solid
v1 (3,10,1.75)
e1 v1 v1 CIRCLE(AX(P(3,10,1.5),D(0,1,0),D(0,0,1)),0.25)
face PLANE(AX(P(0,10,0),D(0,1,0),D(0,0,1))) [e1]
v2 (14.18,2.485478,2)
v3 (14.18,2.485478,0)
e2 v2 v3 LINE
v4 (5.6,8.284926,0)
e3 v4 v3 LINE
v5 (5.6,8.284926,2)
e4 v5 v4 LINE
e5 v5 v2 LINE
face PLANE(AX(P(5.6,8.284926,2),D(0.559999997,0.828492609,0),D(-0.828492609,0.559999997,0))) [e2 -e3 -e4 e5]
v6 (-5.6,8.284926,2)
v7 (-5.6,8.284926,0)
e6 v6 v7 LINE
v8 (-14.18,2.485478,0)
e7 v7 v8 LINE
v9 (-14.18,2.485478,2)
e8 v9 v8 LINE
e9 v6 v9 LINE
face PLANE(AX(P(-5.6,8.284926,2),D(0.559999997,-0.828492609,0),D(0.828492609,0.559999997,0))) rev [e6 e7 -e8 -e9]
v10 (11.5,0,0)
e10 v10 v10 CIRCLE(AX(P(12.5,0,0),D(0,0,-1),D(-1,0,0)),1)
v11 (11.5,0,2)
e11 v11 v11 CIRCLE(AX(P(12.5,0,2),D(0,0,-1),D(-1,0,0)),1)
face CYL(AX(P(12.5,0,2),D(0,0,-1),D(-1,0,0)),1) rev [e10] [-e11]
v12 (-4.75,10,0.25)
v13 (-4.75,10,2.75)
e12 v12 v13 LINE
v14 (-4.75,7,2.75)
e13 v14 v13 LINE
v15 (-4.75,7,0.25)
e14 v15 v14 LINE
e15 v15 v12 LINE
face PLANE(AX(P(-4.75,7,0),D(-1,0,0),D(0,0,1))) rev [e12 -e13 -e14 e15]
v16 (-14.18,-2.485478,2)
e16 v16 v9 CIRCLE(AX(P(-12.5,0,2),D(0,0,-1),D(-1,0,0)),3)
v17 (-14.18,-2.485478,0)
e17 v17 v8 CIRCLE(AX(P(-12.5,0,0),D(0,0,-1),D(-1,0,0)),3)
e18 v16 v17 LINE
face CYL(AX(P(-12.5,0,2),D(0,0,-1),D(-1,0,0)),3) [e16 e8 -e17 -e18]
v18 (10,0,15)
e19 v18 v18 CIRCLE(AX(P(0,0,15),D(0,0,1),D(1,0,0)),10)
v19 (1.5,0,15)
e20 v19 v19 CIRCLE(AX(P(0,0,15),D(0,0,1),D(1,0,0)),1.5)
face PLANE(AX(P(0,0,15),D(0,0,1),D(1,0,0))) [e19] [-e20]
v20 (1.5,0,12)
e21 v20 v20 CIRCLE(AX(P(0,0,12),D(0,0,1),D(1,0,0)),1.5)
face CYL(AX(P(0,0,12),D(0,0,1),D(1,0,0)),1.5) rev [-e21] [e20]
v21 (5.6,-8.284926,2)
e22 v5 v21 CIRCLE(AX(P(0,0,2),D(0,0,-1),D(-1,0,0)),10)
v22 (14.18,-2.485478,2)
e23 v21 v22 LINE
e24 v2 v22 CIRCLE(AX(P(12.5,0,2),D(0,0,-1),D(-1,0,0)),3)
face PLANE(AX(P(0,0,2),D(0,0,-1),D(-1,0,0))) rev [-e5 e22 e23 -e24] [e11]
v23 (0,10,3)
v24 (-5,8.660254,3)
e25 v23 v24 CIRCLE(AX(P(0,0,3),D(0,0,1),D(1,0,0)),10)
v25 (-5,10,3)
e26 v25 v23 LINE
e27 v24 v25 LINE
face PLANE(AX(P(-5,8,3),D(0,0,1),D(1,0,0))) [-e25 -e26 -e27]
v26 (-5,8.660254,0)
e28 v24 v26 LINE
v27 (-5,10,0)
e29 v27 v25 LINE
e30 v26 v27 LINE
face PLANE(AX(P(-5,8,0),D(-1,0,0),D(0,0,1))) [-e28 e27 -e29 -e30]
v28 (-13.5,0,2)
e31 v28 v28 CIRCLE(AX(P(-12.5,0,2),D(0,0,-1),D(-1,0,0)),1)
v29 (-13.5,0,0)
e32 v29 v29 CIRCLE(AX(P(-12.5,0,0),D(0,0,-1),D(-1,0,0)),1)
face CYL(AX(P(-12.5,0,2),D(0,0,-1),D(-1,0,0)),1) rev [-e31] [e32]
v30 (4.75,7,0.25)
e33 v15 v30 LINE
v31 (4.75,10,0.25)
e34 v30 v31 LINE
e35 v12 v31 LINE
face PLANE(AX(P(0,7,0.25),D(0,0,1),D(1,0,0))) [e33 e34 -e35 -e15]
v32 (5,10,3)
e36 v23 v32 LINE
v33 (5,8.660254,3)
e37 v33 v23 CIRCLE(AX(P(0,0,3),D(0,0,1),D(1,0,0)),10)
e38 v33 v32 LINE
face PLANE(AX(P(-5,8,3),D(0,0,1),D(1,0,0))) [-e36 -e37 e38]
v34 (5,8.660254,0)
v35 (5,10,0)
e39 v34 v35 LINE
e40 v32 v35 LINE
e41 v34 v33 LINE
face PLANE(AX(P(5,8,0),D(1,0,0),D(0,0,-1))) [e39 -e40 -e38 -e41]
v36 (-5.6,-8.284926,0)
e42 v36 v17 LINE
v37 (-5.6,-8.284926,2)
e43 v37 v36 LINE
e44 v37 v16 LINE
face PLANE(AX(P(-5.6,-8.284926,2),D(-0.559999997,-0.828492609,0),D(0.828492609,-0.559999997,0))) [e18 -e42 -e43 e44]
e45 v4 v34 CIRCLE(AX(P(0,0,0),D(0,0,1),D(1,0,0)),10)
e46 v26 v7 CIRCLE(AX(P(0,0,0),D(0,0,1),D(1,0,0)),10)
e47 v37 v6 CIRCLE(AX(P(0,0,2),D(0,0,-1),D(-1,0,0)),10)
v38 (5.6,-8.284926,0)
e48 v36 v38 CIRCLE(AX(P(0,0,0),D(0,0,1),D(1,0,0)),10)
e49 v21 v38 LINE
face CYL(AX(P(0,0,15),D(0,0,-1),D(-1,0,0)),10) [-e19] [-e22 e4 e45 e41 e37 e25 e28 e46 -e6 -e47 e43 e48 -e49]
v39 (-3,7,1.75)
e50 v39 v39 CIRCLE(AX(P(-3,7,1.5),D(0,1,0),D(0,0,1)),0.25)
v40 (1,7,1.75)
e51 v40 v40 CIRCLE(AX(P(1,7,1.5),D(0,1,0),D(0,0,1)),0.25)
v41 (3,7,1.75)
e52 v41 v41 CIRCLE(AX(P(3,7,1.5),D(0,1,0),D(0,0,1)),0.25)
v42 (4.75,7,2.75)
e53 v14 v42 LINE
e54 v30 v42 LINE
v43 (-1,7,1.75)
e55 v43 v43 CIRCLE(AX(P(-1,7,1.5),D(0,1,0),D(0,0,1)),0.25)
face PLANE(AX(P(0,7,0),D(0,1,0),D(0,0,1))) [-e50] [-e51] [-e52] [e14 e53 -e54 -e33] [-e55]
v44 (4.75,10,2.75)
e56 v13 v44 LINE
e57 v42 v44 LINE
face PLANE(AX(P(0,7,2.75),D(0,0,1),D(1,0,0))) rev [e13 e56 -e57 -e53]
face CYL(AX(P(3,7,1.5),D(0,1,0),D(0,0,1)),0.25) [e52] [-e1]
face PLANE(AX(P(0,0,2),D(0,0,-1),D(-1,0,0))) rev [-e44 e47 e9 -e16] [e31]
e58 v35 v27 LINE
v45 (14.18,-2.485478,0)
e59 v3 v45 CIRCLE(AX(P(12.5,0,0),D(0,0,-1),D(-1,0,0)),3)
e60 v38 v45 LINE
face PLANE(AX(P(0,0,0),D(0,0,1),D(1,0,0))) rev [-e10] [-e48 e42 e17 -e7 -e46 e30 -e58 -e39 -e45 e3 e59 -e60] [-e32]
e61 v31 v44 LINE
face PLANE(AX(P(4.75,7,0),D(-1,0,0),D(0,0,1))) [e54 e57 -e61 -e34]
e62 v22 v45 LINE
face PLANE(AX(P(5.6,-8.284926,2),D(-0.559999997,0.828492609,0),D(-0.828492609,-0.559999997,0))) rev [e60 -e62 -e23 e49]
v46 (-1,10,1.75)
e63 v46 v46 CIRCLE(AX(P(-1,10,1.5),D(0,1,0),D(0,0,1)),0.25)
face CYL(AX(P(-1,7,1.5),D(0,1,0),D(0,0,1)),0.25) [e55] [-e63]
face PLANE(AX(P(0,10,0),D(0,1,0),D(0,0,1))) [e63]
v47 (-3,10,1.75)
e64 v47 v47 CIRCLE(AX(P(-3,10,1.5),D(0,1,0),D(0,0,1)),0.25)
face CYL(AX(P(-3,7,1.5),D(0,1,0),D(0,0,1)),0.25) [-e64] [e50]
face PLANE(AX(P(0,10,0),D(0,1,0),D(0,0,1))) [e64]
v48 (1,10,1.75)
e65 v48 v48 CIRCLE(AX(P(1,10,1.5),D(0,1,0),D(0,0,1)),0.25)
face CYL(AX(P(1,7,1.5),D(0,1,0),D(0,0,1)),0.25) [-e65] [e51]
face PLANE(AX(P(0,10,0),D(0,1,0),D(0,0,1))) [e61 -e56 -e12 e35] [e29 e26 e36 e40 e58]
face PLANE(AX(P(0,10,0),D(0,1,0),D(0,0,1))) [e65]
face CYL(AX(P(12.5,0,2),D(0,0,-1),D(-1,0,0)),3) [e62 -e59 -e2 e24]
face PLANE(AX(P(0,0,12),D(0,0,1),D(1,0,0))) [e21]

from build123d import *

# Parameters (mm, degrees)
SKETCH1_R               = 10
BOSS_EXTRUDE1_DEPTH     = 15
BOSS_EXTRUDE2_START     = -2
BOSS_EXTRUDE2_OUTLINE_R = 1
BOSS_EXTRUDE2_DEPTH     = 2
SKETCH3_W               = 10
SKETCH3_H               = 3
BOSS_EXTRUDE3_DEPTH     = 2
SKETCH4_W               = 9.5
SKETCH4_H               = 2.5
SKETCH4_R               = 0.25
CUT_EXTRUDE1_DEPTH      = 3
SKETCH5_R               = 1.5
CUT_EXTRUDE2_DEPTH      = 3


# Read off the part's stored shape, not the designer's step: Boss-Extrude2
with BuildPart() as part:
    # Sketch1 → Boss-Extrude1 (new body)
    with BuildSketch(Plane.XY):
        Circle(SKETCH1_R)
    extrude(amount=BOSS_EXTRUDE1_DEPTH)

    # Boss-Extrude2 outline → Boss-Extrude2 (add)
    # profile 1 of 2: a face of its own
    with BuildSketch(Plane(origin=(0, 0, 0), x_dir=(-1, 0, 0), z_dir=(0, 0, -1)).offset(BOSS_EXTRUDE2_START)):
        with BuildLine():
            Line((5.599999975, -8.284926088), (14.179999754, -2.485477473))
            ThreePointArc((14.179999754, -2.485477473), (15.499999574, 0), (14.179999754, 2.485477473))
            Line((14.179999754, 2.485477473), (5.599999975, 8.284926088))
            ThreePointArc((5.599999975, 8.284926088), (10, 0), (5.599999975, -8.284926088))
        make_face()
        with Locations((12.5, 0)):
            Circle(BOSS_EXTRUDE2_OUTLINE_R, mode=Mode.SUBTRACT)
    # profile 2 of 2: a face of its own
    with BuildSketch(Plane(origin=(0, 0, 0), x_dir=(-1, 0, 0), z_dir=(0, 0, -1)).offset(BOSS_EXTRUDE2_START)):
        with BuildLine():
            Line((-14.179999754, -2.485477473), (-5.599999975, -8.284926088))
            ThreePointArc((-5.599999975, -8.284926088), (-10, 0), (-5.599999975, 8.284926088))
            Line((-5.599999975, 8.284926088), (-14.179999754, 2.485477473))
            ThreePointArc((-14.179999754, 2.485477473), (-15.499999574, 0), (-14.179999754, -2.485477473))
        make_face()
        with Locations((-12.5, 0)):
            Circle(BOSS_EXTRUDE2_OUTLINE_R, mode=Mode.SUBTRACT)
    extrude(amount=BOSS_EXTRUDE2_DEPTH)

    # Sketch3 → Boss-Extrude3 (add)
    with BuildSketch(Plane(origin=(0, 10, 0), x_dir=(1, 0, 0), z_dir=(0, 1, 0))):
        with Locations((0, -1.5)):
            Rectangle(SKETCH3_W, SKETCH3_H)
    extrude(amount=-BOSS_EXTRUDE3_DEPTH)

    # Sketch4 → Cut-Extrude1 (cut)
    with BuildSketch(Plane(origin=(0, 10, 0), x_dir=(1, 0, 0), z_dir=(0, 1, 0))):
        with Locations((0, -1.5)):
            Rectangle(SKETCH4_W, SKETCH4_H)
        with Locations(Location((-3, -1.5, 0), (0, 0, 270))):
            Circle(SKETCH4_R, mode=Mode.SUBTRACT)
        with Locations(Location((-1, -1.5, 0), (0, 0, 270))):
            Circle(SKETCH4_R, mode=Mode.SUBTRACT)
        with Locations(Location((1, -1.5, 0), (0, 0, 270))):
            Circle(SKETCH4_R, mode=Mode.SUBTRACT)
        with Locations(Location((3, -1.5, 0), (0, 0, 270))):
            Circle(SKETCH4_R, mode=Mode.SUBTRACT)
    extrude(amount=-CUT_EXTRUDE1_DEPTH, mode=Mode.SUBTRACT)

    # Sketch5 → Cut-Extrude2 (cut)
    with BuildSketch(Plane.XY.offset(15)):
        Circle(SKETCH5_R)
    extrude(amount=-CUT_EXTRUDE2_DEPTH, mode=Mode.SUBTRACT)


solid = part.part
